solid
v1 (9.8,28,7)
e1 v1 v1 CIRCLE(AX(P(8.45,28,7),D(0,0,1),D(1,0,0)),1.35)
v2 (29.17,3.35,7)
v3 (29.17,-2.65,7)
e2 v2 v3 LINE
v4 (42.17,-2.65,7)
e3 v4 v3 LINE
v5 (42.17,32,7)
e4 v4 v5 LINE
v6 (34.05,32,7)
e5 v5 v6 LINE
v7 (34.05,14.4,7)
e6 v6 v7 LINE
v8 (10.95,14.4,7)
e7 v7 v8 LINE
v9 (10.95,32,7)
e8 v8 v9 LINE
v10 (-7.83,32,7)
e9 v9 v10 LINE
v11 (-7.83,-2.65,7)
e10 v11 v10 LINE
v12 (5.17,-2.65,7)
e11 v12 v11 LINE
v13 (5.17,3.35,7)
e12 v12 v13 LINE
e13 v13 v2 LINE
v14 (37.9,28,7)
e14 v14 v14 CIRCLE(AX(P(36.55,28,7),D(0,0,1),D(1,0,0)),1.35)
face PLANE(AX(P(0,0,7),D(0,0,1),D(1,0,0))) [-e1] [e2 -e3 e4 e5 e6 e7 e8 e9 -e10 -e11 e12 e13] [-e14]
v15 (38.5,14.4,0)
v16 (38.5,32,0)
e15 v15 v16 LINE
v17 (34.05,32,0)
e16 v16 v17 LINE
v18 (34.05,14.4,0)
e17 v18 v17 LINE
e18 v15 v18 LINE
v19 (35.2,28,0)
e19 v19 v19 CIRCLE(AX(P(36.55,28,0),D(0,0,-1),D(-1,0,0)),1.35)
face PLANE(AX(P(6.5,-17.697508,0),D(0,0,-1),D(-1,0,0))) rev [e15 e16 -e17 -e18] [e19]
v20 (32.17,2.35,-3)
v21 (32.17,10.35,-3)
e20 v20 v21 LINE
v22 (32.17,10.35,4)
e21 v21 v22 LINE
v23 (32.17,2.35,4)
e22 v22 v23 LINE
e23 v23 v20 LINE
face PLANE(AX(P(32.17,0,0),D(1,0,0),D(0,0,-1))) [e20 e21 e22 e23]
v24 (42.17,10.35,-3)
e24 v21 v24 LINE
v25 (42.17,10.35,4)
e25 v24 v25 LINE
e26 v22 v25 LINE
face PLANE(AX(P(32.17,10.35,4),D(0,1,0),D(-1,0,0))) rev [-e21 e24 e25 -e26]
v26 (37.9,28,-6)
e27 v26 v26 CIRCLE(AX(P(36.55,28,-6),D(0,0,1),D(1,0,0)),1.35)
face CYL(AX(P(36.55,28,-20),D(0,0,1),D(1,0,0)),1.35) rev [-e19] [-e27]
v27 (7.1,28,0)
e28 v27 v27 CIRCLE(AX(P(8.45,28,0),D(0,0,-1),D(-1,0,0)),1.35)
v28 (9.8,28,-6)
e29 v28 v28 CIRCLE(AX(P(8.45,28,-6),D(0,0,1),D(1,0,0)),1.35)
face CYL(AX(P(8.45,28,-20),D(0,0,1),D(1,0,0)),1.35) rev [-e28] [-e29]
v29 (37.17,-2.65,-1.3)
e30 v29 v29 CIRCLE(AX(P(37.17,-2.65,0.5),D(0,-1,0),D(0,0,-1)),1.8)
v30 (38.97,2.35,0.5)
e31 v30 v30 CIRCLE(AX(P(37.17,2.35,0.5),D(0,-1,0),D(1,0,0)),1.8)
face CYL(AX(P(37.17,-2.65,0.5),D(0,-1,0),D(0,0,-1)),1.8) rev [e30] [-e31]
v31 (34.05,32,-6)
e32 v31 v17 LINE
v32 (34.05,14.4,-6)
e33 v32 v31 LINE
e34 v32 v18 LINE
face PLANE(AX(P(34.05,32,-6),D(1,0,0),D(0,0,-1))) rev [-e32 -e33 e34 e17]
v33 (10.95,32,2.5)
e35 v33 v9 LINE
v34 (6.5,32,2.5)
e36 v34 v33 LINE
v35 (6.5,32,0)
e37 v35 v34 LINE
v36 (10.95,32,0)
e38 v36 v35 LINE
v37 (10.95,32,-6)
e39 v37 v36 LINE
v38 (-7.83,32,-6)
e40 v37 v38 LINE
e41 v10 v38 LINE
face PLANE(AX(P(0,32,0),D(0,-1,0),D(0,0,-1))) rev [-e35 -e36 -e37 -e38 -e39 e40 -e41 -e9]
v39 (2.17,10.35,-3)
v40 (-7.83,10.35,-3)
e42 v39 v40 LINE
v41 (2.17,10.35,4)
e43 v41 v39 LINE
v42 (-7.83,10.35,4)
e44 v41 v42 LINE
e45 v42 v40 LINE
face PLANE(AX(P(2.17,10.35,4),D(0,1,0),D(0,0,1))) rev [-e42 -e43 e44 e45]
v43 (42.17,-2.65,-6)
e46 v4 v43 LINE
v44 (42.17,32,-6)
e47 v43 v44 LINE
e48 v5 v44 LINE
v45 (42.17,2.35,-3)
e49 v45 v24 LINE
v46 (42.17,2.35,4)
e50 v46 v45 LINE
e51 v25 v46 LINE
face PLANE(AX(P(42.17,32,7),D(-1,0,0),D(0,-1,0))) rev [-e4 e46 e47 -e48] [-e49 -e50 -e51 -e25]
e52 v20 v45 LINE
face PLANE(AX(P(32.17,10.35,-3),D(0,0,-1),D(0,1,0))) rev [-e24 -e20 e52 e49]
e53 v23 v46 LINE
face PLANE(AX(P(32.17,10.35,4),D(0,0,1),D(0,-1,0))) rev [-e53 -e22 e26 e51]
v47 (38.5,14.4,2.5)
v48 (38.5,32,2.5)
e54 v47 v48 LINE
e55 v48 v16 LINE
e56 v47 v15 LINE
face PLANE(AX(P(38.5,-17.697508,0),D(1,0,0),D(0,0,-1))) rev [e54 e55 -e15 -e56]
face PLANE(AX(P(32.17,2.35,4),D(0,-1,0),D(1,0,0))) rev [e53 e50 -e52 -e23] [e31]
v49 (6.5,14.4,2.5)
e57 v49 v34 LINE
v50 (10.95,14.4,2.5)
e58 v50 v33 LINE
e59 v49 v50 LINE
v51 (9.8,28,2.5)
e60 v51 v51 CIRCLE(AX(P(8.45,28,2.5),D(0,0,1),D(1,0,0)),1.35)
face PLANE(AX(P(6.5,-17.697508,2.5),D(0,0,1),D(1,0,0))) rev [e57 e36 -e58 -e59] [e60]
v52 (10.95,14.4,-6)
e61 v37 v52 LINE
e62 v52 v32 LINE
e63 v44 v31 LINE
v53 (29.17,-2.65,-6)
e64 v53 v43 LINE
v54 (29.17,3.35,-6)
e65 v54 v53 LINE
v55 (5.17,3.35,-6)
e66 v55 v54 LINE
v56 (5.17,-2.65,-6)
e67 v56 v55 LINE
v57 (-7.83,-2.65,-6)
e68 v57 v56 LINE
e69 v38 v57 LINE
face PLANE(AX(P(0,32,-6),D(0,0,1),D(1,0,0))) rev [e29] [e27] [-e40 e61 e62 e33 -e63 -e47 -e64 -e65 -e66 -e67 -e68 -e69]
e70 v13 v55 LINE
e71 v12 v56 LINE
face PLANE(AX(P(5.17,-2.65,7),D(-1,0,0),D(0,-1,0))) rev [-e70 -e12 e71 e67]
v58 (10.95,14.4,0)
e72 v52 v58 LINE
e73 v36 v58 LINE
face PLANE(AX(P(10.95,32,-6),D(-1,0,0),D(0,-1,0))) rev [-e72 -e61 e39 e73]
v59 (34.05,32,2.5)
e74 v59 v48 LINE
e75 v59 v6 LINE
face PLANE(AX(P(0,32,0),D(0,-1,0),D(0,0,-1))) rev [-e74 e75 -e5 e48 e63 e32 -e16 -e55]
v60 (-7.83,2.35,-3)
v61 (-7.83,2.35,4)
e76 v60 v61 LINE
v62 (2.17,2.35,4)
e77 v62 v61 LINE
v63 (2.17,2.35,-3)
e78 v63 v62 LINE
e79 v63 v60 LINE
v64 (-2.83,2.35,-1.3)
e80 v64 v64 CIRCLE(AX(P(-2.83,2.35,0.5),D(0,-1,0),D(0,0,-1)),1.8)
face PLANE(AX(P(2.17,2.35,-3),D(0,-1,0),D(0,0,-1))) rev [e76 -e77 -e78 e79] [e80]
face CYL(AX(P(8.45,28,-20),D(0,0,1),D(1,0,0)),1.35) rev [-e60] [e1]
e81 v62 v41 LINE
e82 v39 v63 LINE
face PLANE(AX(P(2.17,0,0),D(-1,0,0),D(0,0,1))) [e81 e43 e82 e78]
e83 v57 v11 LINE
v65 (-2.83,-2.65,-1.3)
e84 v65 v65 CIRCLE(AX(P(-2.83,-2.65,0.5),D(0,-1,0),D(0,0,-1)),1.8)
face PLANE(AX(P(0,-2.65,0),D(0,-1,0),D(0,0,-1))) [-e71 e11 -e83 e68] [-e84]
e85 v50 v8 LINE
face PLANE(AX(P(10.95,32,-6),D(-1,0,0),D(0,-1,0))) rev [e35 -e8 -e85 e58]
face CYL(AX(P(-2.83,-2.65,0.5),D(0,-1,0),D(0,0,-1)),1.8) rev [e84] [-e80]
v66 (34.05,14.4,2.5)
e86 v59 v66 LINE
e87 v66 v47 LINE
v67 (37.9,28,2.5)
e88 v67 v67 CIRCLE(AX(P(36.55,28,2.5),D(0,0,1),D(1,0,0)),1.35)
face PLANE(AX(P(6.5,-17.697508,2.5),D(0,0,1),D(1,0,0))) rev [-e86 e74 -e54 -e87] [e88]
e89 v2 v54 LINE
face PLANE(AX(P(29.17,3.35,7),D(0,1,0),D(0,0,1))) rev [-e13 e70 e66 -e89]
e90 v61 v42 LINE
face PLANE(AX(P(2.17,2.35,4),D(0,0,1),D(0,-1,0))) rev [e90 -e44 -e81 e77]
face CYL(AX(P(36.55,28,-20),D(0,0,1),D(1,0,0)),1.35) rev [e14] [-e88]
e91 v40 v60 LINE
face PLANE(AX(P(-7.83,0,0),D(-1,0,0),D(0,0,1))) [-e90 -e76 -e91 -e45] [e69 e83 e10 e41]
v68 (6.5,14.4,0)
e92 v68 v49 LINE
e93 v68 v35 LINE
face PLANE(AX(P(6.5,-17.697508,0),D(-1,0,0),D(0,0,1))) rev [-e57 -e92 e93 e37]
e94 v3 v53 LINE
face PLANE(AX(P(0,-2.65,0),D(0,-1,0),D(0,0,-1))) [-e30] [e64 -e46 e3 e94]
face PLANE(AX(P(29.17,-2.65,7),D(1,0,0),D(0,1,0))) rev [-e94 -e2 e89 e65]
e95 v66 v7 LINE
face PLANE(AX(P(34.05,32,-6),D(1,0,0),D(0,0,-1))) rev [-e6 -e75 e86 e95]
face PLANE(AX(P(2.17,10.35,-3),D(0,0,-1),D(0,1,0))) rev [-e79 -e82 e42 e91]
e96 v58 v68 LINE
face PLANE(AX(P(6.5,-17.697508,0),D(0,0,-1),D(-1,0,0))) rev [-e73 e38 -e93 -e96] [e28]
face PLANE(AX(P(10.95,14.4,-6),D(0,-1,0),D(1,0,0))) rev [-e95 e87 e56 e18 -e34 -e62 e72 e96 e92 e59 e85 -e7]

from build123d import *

# Parameters (mm, degrees)
SKETCH1_W                = 45
SKETCH1_H                = 6
BOSS_EXTRUDE1_DEPTH      = 32
SKETCH2_W                = 23.1
SKETCH2_H                = 17.6
CUT_EXTRUDE1_DEPTH       = 56.542776308
SKETCH3_W                = 45
SKETCH3_H                = 20
BOSS_EXTRUDE2_DEPTH      = 6
SKETCH4_W                = 20
SKETCH4_H                = 6
BOSS_EXTRUDE3_DEPTH      = 30
SKETCH5_R                = 1.4
CUT_EXTRUDE2_DEPTH       = 87.423376467
BOSS_EXTRUDE4_DEPTH      = 7
SKETCH7_W                = 32
SKETCH7_H                = 2.5
CUT_EXTRUDE3_DEPTH       = 17.6
SKETCH8_R                = 1.35
CUT_EXTRUDE4_DEPTH       = 86.895285086
CHAMFER1_SIZE            = 1
FILLET1_R                = 1
SKETCH9_W                = 75
SKETCH9_H                = 10
CUT_EXTRUDE5_DEPTH       = 86.895285086
SKETCH10_W               = 45
SKETCH10_H               = 13
BOSS_EXTRUDE5_DEPTH      = 6.65
SKETCH11_W               = 2.83
SKETCH11_H               = 34.65
CUT_EXTRUDE6_DEPTH       = 57.727418415
SKETCH12_W               = 13
SKETCH12_H               = 34.65
BOSS_EXTRUDE6_DEPTH      = 7.83
SKETCH13_W               = 24
SKETCH13_H               = 6
CUT_EXTRUDE7_DEPTH       = 55.509713813
SKETCH14_W               = 7
SKETCH14_H               = 8
CUT_EXTRUDE8_DEPTH       = 10
SKETCH15_W               = 7
SKETCH15_H               = 8
CUT_EXTRUDE9_DEPTH       = 10
M3_CLEARANCE_HOLE1_D     = 3.6
M3_CLEARANCE_HOLE1_DEPTH = 5


with BuildPart() as part:
    # Sketch1 → Boss-Extrude1 (new body)
    with BuildSketch(Plane(origin=(0, 0, 0), x_dir=(1, 0, 0), z_dir=(0, 1, 0))):
        with Locations((22.5, 3)):
            Rectangle(SKETCH1_W, SKETCH1_H)
    extrude(amount=BOSS_EXTRUDE1_DEPTH)

    # Sketch2 → Cut-Extrude1 (cut, through all)
    with BuildSketch(Plane.XY):
        with Locations((22.5, 23.2)):
            Rectangle(SKETCH2_W, SKETCH2_H)
    extrude(amount=-CUT_EXTRUDE1_DEPTH, mode=Mode.SUBTRACT)

    # Sketch3 → Boss-Extrude2 (add)
    with BuildSketch(Plane.XZ):
        with Locations((22.5, -10)):
            Rectangle(SKETCH3_W, SKETCH3_H)
    extrude(amount=BOSS_EXTRUDE2_DEPTH)

    # Sketch4 → Boss-Extrude3 (add)
    with BuildSketch(Plane(origin=(45, 0, 0), x_dir=(0, 0, -1), z_dir=(1, 0, 0))):
        with Locations((10, -3)):
            Rectangle(SKETCH4_W, SKETCH4_H)
    extrude(amount=BOSS_EXTRUDE3_DEPTH)

    # Sketch5 → Cut-Extrude2 (cut, through all)
    with BuildSketch(Plane.XZ.offset(6)):
        with Locations(Location((37.288839919, -16.75, 0), (0, 0, 270))):
            Circle(SKETCH5_R)
        with Locations(Location((47.288839919, -16.75, 0), (0, 0, 270))):
            Circle(SKETCH5_R)
        with Locations(Location((47.288839919, -6.75, 0), (0, 0, 270))):
            Circle(SKETCH5_R)
        with Locations(Location((59.538839919, -16.75, 0), (0, 0, 270))):
            Circle(SKETCH5_R)
        with Locations(Location((71.788839919, -16.75, 0), (0, 0, 270))):
            Circle(SKETCH5_R)
        with Locations(Location((71.788839919, -6.75, 0), (0, 0, 270))):
            Circle(SKETCH5_R)
        with Locations(Location((59.538839919, -6.75, 0), (0, 0, 270))):
            Circle(SKETCH5_R)
    extrude(amount=-CUT_EXTRUDE2_DEPTH, mode=Mode.SUBTRACT)

    # Sketch6 → Boss-Extrude4 (add)
    with BuildSketch(Plane.XY):
        Polygon((0, 32), (0, -6), (45, -6), (45, 0), (45, 32), (34.05, 32), (34.05, 14.4), (10.95, 14.4), (10.95, 32), align=None)
    extrude(amount=BOSS_EXTRUDE4_DEPTH)

    # Sketch7 → Cut-Extrude3 (cut)
    with BuildSketch(Plane(origin=(0, 32, 0), x_dir=(1, 0, 0), z_dir=(0, 1, 0))):
        with Locations((22.5, -1.25)):
            Rectangle(SKETCH7_W, SKETCH7_H)
    extrude(amount=-CUT_EXTRUDE3_DEPTH, mode=Mode.SUBTRACT)

    # Sketch8 → Cut-Extrude4 (cut, through all)
    with BuildSketch(Plane.XY.offset(7)):
        with Locations((8.45, 28)):
            Circle(SKETCH8_R)
        with Locations((36.55, 28)):
            Circle(SKETCH8_R)
    extrude(amount=-CUT_EXTRUDE4_DEPTH, mode=Mode.SUBTRACT)

    # Chamfer1
    chamfer1_edges = [part.edges().sort_by_distance(p)[0] for p in [
        (22.5, -6, 7),
        (0, -6, -6.5),
        (37.5, -6, -20),
        (60, -6, 0),
        (75, -6, -10),
        (45, -6, 3.5),
    ]]
    chamfer(chamfer1_edges, length=CHAMFER1_SIZE)

    # Fillet1
    # the kernel refuses this fillet: 1 mm, written as the material it adds along each edge
    with BuildSketch(Plane(origin=(45, 0, -6), x_dir=(0, 1, 0), z_dir=(0, 0, 1))) as fillet1_piece_1:
        with BuildLine():
            CenterArc((FILLET1_R, -FILLET1_R), FILLET1_R, 90, 90)
            Line((0, -FILLET1_R), (0, 0))
            Line((0, 0), (FILLET1_R, 0))
        make_face()
    extrude(amount=6)
    with BuildSketch(Plane(origin=(45, 0, -6), x_dir=(0, 0, -1), z_dir=(-1, 0, 0))) as fillet1_piece_2:
        with BuildLine():
            CenterArc((FILLET1_R, -FILLET1_R), FILLET1_R, 90, 90)
            Line((0, -FILLET1_R), (0, 0))
            Line((0, 0), (FILLET1_R, 0))
        make_face()
    extrude(amount=45)
    with BuildSketch(Plane(origin=(45, -7.5, 0), x_dir=(1, 0, 0), z_dir=(0, 1, 0))) as fillet1_piece_3_section:
        with BuildLine():
            CenterArc((FILLET1_R, -FILLET1_R), FILLET1_R, 90, 90)
            Line((0, -FILLET1_R), (0, 0))
            Line((0, 0), (FILLET1_R, 0))
        make_face()
    fillet1_piece_3 = extrude(amount=7.5, mode=Mode.PRIVATE)
    fillet1_piece_3 = split(fillet1_piece_3, bisect_by=Plane(origin=(45.042981958, -4.592558865, 0.407441135), z_dir=(0, -0.7071067811865476, 0.7071067811865476)), keep=Keep.TOP, mode=Mode.PRIVATE)
    fillet1_piece_3 = split(fillet1_piece_3, bisect_by=Plane(origin=(45.16446835, -4.83553165, 0.528927527), z_dir=(-0.7071067811865476, 0.7071067811865476, 0)), keep=Keep.TOP, mode=Mode.PRIVATE)
    add(fillet1_piece_3)
    with BuildSketch(Plane(origin=(45, -7.5, 0), x_dir=(1, 0, 0), z_dir=(0, 1, 0))) as fillet1_piece_4_section:
        with BuildLine():
            CenterArc((FILLET1_R, -FILLET1_R), FILLET1_R, 90, 90)
            Line((0, -FILLET1_R), (0, 0))
            Line((0, 0), (FILLET1_R, 0))
        make_face()
    fillet1_piece_4 = extrude(amount=7.5, mode=Mode.PRIVATE)
    fillet1_piece_4 = split(fillet1_piece_4, bisect_by=Plane(origin=(45.528927527, -4.83553165, 0.16446835), z_dir=(0, 0.7071067811865476, -0.7071067811865476)), keep=Keep.TOP, mode=Mode.PRIVATE)
    fillet1_piece_4 = split(fillet1_piece_4, bisect_by=Plane(origin=(45.407441135, -4.592558865, 0.042981958), z_dir=(0.7071067811865476, -0.7071067811865476, 0)), keep=Keep.TOP, mode=Mode.PRIVATE)
    add(fillet1_piece_4)
    with BuildSketch(Plane(origin=(45, -7.5, 0), x_dir=(1, 0, 0), z_dir=(0, 1, 0))) as fillet1_piece_5_section:
        with BuildLine():
            CenterArc((FILLET1_R, -FILLET1_R), FILLET1_R, 90, 90)
            Line((0, -FILLET1_R), (0, 0))
            Line((0, 0), (FILLET1_R, 0))
        make_face()
    fillet1_piece_5 = extrude(amount=7.5, mode=Mode.PRIVATE)
    fillet1_piece_5 = split(fillet1_piece_5, bisect_by=Plane(origin=(45.222376568, -3.546419499, 1.453580501), z_dir=(0, 0.7071067811865476, -0.7071067811865476)), keep=Keep.TOP, mode=Mode.PRIVATE)
    fillet1_piece_5 = split(fillet1_piece_5, bisect_by=Plane(origin=(46.453580501, -3.546419499, 0.222376568), z_dir=(-0.7071067811865476, 0.7071067811865476, 0)), keep=Keep.TOP, mode=Mode.PRIVATE)
    add(fillet1_piece_5)
    with BuildSketch(Plane(origin=(45, 0, -8.5), x_dir=(0, 1, 0), z_dir=(0, 0, 1))) as fillet1_piece_6a_section:
        with BuildLine():
            CenterArc((FILLET1_R, -FILLET1_R), FILLET1_R, 90, 90)
            Line((0, -FILLET1_R), (0, 0))
            Line((0, 0), (FILLET1_R, 0))
        make_face()
    fillet1_piece_6a = extrude(amount=8.5, mode=Mode.PRIVATE)
    fillet1_piece_6a = split(fillet1_piece_6a, bisect_by=Plane(origin=(45.224393795, 0.227043758, -6), z_dir=(0, 0, -1)), keep=Keep.TOP, mode=Mode.PRIVATE)
    fillet1_piece_6a = fillet1_piece_6a - Plane(origin=(47.288839919, 0.227043758, -6.75), x_dir=(0, 0, -1), z_dir=(0, -1, 0)) * Cylinder(1.4, 21, mode=Mode.PRIVATE)
    with BuildSketch(Plane(origin=(47.5, 0, -6), x_dir=(0, 0, -1), z_dir=(-1, 0, 0))) as fillet1_piece_6b_section:
        with BuildLine():
            CenterArc((FILLET1_R, -FILLET1_R), FILLET1_R, 90, 90)
            Line((0, -FILLET1_R), (0, 0))
            Line((0, 0), (FILLET1_R, 0))
        make_face()
    fillet1_piece_6b = extrude(amount=47.5, mode=Mode.PRIVATE)
    fillet1_piece_6b = split(fillet1_piece_6b, bisect_by=Plane(origin=(45, 0.236066937, -6.212082633), z_dir=(1, 0, 0)), keep=Keep.TOP, mode=Mode.PRIVATE)
    fillet1_piece_6b = fillet1_piece_6b - Plane(origin=(47.288839919, 0.236066937, -6.75), x_dir=(0, 0, -1), z_dir=(0, -1, 0)) * Cylinder(1.4, 99, mode=Mode.PRIVATE)
    fillet1_piece_6 = fillet1_piece_6a & fillet1_piece_6b
    add(fillet1_piece_6)
    with BuildSketch(Plane(origin=(45, -7.5, 0), x_dir=(1, 0, 0), z_dir=(0, 1, 0))) as fillet1_piece_7a_section:
        with BuildLine():
            CenterArc((FILLET1_R, -FILLET1_R), FILLET1_R, 90, 90)
            Line((0, -FILLET1_R), (0, 0))
            Line((0, 0), (FILLET1_R, 0))
        make_face()
    fillet1_piece_7a = extrude(amount=10, mode=Mode.PRIVATE)
    fillet1_piece_7a = split(fillet1_piece_7a, bisect_by=Plane(origin=(45.226395114, 0, 0.226395114), z_dir=(0, 1, 0)), keep=Keep.TOP, mode=Mode.PRIVATE)
    with BuildSketch(Plane(origin=(45, 0, -6), x_dir=(0, 1, 0), z_dir=(0, 0, 1))) as fillet1_piece_7b_section:
        with BuildLine():
            CenterArc((FILLET1_R, -FILLET1_R), FILLET1_R, 90, 90)
            Line((0, -FILLET1_R), (0, 0))
            Line((0, 0), (FILLET1_R, 0))
        make_face()
    fillet1_piece_7b = extrude(amount=8.5, mode=Mode.PRIVATE)
    fillet1_piece_7b = split(fillet1_piece_7b, bisect_by=Plane(origin=(45.226395114, 0.226395114, 0), z_dir=(0, 0, 1)), keep=Keep.TOP, mode=Mode.PRIVATE)
    fillet1_piece_7 = fillet1_piece_7a & fillet1_piece_7b
    add(fillet1_piece_7)

    # Sketch9 → Cut-Extrude5 (cut, through all)
    with BuildSketch(Plane.XY.offset(7)):
        with Locations((37.5, -1)):
            Rectangle(SKETCH9_W, SKETCH9_H)
    extrude(amount=-CUT_EXTRUDE5_DEPTH, mode=Mode.SUBTRACT)

    # Sketch10 → Boss-Extrude5 (add)
    with BuildSketch(Plane.XZ.offset(-4)):
        with Locations((22.5, 0.5)):
            Rectangle(SKETCH10_W, SKETCH10_H)
    extrude(amount=BOSS_EXTRUDE5_DEPTH)

    # Sketch11 → Cut-Extrude6 (cut, through all)
    with BuildSketch(Plane(origin=(0, 0, -6), x_dir=(-1, 0, 0), z_dir=(0, 0, -1))):
        with Locations((-43.585, 14.675)):
            Rectangle(SKETCH11_W, SKETCH11_H)
    extrude(amount=-CUT_EXTRUDE6_DEPTH, mode=Mode.SUBTRACT)

    # Sketch12 → Boss-Extrude6 (add)
    with BuildSketch(Plane.ZY):
        with Locations((0.5, 14.675)):
            Rectangle(SKETCH12_W, SKETCH12_H)
    extrude(amount=BOSS_EXTRUDE6_DEPTH)

    # Sketch13 → Cut-Extrude7 (cut, through all)
    with BuildSketch(Plane(origin=(0, 0, -6), x_dir=(-1, 0, 0), z_dir=(0, 0, -1))):
        with Locations((-17.17, 0.35)):
            Rectangle(SKETCH13_W, SKETCH13_H)
    extrude(amount=-CUT_EXTRUDE7_DEPTH, mode=Mode.SUBTRACT)

    # Sketch14 → Cut-Extrude8 (cut)
    with BuildSketch(Plane(origin=(42.17, 0, 0), x_dir=(0, 0, -1), z_dir=(1, 0, 0))):
        with Locations((-0.5, 6.35)):
            Rectangle(SKETCH14_W, SKETCH14_H)
    extrude(amount=-CUT_EXTRUDE8_DEPTH, mode=Mode.SUBTRACT)

    # Sketch15 → Cut-Extrude9 (cut)
    with BuildSketch(Plane.ZY.offset(7.83)):
        with Locations((0.5, 6.35)):
            Rectangle(SKETCH15_W, SKETCH15_H)
    extrude(amount=-CUT_EXTRUDE9_DEPTH, mode=Mode.SUBTRACT)

    # M3 Clearance Hole1
    with Locations(Plane(origin=(0, -2.65, 0), x_dir=(-1, 0, 0), z_dir=(0, -1, 0))):
        with Locations((2.83, -0.5), (-37.17, -0.5)):
            Hole(M3_CLEARANCE_HOLE1_D / 2, depth=M3_CLEARANCE_HOLE1_DEPTH)


solid = part.part
